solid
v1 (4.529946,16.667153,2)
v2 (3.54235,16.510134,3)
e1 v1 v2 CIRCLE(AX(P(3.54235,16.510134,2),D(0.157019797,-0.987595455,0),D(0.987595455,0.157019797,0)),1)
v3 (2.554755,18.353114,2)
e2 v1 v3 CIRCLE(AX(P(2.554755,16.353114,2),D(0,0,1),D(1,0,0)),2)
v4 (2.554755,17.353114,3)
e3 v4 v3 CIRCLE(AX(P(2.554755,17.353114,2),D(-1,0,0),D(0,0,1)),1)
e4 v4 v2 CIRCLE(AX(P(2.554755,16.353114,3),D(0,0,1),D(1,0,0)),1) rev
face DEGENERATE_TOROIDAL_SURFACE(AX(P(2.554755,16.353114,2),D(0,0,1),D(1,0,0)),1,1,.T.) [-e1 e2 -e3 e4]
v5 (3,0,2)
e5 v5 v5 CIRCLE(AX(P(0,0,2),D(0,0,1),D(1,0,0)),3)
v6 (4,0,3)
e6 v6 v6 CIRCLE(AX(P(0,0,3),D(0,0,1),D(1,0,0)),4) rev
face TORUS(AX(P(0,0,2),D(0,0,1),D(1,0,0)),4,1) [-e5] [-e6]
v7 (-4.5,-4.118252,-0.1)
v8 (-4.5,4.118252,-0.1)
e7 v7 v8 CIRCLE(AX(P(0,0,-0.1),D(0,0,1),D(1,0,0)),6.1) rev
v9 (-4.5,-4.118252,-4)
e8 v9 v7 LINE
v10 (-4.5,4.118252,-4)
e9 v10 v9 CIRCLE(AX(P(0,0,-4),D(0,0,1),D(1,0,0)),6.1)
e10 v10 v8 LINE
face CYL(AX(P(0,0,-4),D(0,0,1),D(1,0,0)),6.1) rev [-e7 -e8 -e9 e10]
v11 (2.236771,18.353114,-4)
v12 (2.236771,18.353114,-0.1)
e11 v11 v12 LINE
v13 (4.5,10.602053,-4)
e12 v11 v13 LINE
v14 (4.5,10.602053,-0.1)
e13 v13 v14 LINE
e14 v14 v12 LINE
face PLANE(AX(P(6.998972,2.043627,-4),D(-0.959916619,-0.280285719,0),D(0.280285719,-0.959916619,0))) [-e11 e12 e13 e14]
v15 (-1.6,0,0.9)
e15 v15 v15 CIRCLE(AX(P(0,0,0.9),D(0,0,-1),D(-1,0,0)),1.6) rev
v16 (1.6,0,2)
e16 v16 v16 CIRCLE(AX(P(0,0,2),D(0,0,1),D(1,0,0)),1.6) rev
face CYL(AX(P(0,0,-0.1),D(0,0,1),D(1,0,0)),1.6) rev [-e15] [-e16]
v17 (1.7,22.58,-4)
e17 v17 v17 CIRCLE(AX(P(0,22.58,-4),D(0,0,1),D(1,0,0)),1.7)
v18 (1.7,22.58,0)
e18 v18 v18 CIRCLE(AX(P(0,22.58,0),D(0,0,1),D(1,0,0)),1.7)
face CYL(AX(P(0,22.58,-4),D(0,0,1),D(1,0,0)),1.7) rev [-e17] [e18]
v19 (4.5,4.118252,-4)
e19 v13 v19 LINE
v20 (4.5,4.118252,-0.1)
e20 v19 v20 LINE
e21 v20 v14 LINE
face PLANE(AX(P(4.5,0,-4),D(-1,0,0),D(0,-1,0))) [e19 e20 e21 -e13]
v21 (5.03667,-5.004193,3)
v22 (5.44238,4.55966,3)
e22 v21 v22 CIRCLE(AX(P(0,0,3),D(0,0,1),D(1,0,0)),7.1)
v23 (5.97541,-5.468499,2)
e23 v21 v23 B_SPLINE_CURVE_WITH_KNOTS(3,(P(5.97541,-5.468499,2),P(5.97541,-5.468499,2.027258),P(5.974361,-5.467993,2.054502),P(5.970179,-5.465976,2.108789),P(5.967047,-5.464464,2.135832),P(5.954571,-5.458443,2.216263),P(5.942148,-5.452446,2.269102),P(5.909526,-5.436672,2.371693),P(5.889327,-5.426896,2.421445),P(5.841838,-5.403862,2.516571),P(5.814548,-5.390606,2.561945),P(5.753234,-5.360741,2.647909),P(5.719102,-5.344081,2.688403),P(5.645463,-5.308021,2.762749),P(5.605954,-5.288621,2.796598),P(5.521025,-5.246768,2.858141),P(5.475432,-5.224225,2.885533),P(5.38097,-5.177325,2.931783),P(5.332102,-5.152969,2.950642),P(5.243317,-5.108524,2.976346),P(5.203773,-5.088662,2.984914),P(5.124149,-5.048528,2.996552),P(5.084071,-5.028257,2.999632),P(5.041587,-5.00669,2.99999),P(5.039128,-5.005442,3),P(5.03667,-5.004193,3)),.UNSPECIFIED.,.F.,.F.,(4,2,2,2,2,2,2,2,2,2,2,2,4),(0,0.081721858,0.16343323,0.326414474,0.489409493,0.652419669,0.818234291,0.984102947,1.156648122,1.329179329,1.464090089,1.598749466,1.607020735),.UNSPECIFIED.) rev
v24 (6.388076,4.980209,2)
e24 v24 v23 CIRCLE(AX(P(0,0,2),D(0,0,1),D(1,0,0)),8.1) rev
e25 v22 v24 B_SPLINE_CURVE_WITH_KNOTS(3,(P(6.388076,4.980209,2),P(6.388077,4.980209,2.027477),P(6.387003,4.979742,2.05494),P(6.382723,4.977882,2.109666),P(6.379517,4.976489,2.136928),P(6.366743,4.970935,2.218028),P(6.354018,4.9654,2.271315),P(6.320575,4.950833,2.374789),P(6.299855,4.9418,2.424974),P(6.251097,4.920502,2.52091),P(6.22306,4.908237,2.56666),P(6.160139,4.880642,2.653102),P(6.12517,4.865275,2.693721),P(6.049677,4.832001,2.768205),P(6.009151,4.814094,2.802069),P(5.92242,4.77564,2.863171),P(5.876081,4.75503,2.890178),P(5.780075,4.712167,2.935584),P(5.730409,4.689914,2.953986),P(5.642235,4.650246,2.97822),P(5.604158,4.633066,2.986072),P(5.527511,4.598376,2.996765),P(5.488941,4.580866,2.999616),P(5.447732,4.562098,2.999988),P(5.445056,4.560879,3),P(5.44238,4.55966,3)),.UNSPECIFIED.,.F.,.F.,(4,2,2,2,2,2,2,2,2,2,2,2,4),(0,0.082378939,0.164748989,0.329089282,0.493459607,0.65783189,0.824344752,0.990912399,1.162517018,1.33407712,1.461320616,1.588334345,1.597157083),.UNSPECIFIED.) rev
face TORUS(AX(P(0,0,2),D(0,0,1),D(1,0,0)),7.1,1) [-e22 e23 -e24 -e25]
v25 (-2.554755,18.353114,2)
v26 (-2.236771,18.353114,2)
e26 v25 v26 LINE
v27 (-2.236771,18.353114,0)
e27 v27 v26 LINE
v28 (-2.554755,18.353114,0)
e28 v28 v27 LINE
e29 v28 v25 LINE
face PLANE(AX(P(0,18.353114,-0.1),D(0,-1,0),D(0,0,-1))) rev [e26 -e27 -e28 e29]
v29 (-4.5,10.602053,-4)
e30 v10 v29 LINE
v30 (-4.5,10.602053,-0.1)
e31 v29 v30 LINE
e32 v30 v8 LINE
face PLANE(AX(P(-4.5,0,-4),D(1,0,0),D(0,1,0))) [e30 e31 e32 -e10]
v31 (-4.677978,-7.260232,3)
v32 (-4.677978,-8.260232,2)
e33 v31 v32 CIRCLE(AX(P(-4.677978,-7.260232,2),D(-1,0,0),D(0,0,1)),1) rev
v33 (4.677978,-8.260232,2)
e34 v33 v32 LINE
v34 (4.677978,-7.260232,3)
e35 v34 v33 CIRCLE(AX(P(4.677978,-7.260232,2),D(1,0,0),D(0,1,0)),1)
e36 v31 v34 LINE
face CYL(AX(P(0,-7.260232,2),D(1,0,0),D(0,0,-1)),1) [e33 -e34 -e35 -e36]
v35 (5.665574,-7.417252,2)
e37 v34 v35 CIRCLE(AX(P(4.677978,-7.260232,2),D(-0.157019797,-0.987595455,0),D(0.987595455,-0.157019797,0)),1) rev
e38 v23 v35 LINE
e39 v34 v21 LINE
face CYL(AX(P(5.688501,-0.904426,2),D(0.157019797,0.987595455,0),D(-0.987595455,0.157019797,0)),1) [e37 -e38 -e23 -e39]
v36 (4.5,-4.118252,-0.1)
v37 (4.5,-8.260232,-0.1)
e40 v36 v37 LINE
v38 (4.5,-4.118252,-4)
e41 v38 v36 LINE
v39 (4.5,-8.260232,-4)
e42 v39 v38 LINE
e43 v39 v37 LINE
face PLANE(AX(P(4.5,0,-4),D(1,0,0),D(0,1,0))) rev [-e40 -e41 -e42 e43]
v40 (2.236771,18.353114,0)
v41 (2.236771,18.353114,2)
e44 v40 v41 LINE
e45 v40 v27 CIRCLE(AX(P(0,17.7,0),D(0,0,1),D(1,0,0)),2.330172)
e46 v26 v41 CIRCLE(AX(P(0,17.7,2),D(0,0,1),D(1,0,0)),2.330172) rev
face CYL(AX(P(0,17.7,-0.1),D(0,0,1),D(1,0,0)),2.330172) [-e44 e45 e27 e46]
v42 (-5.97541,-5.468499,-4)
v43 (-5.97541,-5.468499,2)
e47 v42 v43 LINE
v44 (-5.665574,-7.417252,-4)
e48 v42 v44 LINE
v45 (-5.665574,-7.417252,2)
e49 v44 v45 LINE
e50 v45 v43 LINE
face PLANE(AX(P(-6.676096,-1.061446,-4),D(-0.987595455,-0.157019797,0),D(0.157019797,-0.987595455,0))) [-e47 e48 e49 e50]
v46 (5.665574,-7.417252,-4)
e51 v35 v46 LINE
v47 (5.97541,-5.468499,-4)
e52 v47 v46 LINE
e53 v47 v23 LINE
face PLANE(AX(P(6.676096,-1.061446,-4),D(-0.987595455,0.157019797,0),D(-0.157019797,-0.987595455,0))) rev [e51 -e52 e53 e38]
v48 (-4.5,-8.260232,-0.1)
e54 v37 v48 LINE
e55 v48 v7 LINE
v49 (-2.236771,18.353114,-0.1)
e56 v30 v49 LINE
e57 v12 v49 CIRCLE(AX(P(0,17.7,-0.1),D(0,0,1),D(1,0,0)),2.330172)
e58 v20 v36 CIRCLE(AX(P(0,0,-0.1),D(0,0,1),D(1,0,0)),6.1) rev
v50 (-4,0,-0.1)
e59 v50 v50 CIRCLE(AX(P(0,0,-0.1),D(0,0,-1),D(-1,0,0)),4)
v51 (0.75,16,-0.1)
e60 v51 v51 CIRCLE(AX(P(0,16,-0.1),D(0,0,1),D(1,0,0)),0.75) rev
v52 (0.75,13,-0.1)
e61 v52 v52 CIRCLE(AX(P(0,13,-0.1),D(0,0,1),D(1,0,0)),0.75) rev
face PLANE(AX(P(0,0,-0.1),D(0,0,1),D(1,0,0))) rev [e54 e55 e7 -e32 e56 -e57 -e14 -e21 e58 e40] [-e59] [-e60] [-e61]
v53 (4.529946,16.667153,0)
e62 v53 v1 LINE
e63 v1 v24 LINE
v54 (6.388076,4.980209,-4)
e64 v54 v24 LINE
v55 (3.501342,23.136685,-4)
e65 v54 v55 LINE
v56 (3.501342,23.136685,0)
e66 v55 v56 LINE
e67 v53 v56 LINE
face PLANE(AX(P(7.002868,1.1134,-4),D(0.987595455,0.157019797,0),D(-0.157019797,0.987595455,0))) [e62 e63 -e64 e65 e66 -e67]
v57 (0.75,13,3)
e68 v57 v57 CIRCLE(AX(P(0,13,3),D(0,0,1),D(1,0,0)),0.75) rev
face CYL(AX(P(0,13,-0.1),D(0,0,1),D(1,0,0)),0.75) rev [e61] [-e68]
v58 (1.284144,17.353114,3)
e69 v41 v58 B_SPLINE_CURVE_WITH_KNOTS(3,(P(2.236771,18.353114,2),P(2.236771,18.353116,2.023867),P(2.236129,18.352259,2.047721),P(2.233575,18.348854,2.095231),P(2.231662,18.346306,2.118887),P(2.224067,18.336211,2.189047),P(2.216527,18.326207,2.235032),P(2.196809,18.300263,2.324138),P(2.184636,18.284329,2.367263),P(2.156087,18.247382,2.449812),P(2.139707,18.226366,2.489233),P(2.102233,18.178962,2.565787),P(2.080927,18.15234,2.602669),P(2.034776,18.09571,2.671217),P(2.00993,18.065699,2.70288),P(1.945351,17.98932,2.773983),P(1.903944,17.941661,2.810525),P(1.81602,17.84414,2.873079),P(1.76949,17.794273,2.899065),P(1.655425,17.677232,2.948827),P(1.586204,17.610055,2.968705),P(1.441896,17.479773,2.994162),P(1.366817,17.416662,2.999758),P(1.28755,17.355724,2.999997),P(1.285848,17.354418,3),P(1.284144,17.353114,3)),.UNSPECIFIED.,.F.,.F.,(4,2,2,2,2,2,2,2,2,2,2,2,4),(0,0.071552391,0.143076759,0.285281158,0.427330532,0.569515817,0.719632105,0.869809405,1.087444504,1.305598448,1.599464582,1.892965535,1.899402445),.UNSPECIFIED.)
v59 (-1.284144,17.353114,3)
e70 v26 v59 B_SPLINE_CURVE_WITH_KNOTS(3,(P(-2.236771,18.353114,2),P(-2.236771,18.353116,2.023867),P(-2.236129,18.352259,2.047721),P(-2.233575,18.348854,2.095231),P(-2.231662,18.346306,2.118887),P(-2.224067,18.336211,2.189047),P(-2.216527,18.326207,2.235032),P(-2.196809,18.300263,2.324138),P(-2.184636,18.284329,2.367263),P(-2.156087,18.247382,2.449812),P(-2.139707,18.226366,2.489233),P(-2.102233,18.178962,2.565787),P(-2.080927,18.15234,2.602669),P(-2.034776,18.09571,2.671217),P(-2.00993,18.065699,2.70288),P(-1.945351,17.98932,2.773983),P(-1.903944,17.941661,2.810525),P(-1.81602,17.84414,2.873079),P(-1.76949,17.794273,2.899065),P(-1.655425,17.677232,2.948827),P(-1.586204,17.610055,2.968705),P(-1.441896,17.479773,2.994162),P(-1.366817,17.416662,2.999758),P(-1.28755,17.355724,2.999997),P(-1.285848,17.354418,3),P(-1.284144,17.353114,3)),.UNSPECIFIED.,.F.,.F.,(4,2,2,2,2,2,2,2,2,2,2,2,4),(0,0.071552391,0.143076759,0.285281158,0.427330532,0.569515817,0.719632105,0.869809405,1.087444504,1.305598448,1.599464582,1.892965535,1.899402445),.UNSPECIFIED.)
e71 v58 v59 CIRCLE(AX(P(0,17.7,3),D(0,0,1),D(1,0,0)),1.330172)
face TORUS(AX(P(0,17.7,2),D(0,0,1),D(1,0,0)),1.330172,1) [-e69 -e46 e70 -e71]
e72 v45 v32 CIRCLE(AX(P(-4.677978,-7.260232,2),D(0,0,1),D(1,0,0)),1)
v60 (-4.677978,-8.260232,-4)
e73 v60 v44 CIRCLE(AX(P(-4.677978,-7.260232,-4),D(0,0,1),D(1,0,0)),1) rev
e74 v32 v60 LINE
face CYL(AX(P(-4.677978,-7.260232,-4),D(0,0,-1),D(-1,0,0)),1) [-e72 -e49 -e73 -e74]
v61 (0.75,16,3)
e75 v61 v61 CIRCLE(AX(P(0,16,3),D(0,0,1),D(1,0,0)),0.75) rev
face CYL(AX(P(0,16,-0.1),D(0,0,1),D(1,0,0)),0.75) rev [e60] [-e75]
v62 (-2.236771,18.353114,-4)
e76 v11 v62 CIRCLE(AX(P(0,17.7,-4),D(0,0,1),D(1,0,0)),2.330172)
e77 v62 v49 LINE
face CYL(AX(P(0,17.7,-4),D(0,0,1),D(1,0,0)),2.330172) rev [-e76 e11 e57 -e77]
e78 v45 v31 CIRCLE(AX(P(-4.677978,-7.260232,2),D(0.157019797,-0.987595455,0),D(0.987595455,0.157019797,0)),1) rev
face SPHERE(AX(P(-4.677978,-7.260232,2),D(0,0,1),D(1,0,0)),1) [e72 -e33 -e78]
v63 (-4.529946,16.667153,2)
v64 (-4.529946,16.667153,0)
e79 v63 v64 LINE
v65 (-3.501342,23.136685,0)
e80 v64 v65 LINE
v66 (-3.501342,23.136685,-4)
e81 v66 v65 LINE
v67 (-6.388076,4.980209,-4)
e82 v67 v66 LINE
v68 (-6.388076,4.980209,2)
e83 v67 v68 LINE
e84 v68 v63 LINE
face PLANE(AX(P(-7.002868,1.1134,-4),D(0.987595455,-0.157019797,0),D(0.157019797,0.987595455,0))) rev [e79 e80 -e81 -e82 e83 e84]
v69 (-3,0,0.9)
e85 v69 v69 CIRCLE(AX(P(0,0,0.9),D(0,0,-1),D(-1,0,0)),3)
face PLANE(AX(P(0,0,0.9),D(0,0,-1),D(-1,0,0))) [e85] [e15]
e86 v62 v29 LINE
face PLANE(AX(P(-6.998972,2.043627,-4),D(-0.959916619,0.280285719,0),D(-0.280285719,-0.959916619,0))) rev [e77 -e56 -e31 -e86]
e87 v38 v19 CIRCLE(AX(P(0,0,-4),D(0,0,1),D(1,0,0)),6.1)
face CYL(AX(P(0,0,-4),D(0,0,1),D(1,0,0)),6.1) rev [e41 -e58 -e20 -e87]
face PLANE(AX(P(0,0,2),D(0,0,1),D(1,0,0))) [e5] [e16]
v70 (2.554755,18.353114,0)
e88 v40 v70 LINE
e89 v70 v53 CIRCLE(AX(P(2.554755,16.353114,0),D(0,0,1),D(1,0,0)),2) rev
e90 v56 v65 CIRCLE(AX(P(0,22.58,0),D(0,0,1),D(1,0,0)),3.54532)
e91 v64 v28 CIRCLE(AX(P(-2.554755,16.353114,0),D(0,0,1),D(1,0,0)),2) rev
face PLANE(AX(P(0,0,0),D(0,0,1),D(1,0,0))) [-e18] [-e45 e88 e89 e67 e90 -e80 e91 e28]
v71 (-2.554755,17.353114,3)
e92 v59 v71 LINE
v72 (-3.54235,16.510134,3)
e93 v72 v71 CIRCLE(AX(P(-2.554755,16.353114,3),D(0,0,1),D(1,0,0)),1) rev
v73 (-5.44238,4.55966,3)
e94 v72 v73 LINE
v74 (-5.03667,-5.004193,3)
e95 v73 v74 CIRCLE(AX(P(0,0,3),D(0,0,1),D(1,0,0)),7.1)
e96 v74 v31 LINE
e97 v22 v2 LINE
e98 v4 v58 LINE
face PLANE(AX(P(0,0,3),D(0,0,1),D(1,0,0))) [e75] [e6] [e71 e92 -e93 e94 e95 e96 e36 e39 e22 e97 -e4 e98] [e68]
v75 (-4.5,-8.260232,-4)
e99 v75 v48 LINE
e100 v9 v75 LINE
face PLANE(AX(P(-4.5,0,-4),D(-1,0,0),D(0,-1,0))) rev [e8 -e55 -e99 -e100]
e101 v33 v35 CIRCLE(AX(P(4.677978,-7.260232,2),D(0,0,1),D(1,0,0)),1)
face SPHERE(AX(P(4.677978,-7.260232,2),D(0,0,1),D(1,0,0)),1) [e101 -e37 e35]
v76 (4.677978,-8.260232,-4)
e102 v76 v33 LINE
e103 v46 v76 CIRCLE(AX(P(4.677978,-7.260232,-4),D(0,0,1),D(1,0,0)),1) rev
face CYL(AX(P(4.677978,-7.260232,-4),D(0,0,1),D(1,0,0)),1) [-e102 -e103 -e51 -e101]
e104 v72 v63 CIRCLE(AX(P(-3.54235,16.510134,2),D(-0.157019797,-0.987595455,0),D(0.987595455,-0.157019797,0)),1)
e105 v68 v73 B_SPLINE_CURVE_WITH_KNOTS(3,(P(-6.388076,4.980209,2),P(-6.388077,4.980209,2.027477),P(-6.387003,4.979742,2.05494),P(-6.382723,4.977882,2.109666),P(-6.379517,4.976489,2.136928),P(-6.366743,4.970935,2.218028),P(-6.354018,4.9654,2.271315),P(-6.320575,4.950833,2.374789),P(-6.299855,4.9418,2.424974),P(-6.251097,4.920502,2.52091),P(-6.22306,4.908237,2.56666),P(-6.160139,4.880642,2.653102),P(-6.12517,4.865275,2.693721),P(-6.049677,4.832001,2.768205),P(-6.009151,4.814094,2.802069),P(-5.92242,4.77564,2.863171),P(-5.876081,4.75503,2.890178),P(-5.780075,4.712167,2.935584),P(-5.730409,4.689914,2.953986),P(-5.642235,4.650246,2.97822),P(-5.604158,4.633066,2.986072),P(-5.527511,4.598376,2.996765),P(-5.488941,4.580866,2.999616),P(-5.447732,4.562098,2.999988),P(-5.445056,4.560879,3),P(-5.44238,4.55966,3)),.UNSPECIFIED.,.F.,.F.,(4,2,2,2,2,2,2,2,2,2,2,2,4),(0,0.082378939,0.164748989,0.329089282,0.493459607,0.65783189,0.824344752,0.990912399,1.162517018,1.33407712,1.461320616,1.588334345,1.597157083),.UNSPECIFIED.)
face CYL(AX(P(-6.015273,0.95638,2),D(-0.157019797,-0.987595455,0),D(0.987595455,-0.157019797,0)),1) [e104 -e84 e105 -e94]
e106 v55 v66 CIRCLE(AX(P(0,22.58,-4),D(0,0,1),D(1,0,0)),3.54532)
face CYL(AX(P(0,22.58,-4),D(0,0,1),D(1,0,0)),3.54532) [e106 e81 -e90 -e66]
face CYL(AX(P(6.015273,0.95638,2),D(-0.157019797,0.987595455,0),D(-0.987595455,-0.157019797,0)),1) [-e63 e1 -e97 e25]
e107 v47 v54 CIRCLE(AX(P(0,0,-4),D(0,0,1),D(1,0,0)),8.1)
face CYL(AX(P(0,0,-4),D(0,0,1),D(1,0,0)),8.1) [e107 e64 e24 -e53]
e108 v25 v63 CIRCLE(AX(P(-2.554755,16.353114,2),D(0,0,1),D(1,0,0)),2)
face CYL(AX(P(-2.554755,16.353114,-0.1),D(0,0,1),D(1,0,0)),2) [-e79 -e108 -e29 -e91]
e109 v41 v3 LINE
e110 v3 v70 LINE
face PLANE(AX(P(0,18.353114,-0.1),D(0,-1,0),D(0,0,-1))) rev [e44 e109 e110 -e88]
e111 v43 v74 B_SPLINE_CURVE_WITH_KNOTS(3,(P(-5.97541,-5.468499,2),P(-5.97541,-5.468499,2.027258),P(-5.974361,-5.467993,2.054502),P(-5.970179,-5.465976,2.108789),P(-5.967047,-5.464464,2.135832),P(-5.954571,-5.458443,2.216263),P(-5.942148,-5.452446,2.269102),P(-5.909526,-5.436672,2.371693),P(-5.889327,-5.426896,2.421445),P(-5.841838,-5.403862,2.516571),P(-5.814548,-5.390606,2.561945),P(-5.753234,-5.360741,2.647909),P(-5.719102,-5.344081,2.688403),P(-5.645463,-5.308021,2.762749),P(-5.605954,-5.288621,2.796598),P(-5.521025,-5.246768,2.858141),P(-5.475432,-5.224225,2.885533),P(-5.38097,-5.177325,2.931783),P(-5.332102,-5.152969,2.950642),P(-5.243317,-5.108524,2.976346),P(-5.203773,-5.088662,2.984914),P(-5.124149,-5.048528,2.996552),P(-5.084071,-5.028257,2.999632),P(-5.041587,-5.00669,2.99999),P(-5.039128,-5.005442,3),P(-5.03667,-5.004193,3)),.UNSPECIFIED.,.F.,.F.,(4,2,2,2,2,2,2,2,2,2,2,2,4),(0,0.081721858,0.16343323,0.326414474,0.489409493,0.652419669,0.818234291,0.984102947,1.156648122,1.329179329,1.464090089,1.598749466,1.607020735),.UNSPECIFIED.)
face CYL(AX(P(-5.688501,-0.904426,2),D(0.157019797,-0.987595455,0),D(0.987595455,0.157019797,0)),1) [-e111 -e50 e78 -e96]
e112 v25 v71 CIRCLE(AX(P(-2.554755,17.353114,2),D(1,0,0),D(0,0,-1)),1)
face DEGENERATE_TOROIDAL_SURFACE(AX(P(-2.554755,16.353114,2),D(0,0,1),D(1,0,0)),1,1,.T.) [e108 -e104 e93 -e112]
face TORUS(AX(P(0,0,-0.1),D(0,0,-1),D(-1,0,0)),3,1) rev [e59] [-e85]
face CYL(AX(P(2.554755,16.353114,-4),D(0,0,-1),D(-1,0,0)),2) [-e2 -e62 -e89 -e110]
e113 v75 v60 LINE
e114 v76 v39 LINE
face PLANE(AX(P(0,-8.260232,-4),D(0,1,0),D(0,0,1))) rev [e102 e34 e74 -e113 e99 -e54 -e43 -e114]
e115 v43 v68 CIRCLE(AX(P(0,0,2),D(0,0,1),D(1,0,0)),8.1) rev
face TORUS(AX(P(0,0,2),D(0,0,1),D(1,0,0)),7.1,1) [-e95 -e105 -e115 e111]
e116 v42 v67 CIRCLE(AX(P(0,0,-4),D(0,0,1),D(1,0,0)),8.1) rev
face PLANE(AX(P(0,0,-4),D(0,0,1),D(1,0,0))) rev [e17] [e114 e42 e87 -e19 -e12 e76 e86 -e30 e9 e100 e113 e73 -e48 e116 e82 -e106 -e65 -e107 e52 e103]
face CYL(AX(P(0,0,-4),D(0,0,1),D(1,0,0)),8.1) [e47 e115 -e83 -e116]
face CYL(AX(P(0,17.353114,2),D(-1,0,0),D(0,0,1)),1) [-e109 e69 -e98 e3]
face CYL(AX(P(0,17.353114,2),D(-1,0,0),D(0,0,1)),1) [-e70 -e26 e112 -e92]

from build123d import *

# Parameters (mm, degrees)
SKETCH1_R                = 1.7
BOSS_EXTRUDE4_DEPTH      = 4
BOSS_EXTRUDE6_DEPTH      = 3
BOSS_EXTRUDE6_DEPTH_BACK = 0.1
SKETCH1_9_R              = 0.749999999999988
SKETCH1_9_R_2            = 0.749999999999991
SKETCH1_9_R_3            = 1.6
FILLET2_R                = 1
FILLET3_R                = 2
SKETCH2_R                = 4
CUT_EXTRUDE1_DEPTH       = 1
SKETCH3_R                = 3.0000000000000004
CUT_EXTRUDE2_DEPTH       = 1
FILLET4_R                = 1
FILLET5_R                = 1


# Some blends are built 0.0001 mm under size
with BuildPart() as part:
    # Sketch1 → Boss-Extrude4 (new body)
    with BuildSketch(Plane.XY):
        with BuildLine():
            Line((-3.5013415582545715, 23.136685369325342), (-6.388076465833109, 4.9802087372588275))
            ThreePointArc((-6.388076465833109, 4.9802087372588275), (-8.093690123038968, -0.31965636583910695), (-5.975409836065571, -5.468498632261951))
            Line((-5.9754098360655705, -5.468498632261951), (-5.531546482610164, -8.2602321522629))
            Line((-5.531546482610164, -8.2602321522629), (-4.5, -8.2602321522629))
            Line((-4.499999999999999, -8.2602321522629), (-4.500000000000003, -4.1182520563948))
            ThreePointArc((-4.500000000000003, -4.1182520563948), (-6.1, -6.7e-16), (-4.500000000000001, 4.118252056394799))
            Line((-4.5, 4.118252056394798), (-4.500000000000003, 10.602053391322137))
            Line((-4.500000000000003, 10.602053391322137), (-2.23677055895614, 18.353113855252126))
            ThreePointArc((-2.236770558956141, 18.353113855252126), (5.33e-15, 20.030171719280638), (2.2367705589561506, 18.353113855252126))
            Line((2.2367705589561497, 18.353113855252126), (4.499999999999999, 10.602053391322137))
            Line((4.499999999999999, 10.602053391322137), (4.500000000000003, 4.1182520563948))
            ThreePointArc((4.5000000000000036, 4.1182520563948), (6.099999999999998, -2.2e-16), (4.5, -4.118252056394798))
            Line((4.5, -4.118252056394798), (4.500000000000001, -8.260232152262898))
            Line((4.500000000000001, -8.2602321522629), (5.531546482610164, -8.2602321522629))
            Line((5.531546482610164, -8.2602321522629), (5.975409836065575, -5.468498632261945))
            ThreePointArc((5.975409836065576, -5.468498632261946), (8.093690123038972, -0.3196563658391036), (6.388076465833111, 4.9802087372588275))
            Line((6.388076465833109, 4.9802087372588275), (3.5013415582545715, 23.136685369325342))
            ThreePointArc((3.5013415582545715, 23.136685369325342), (-1.1e-16, 26.125319634106553), (-3.5013415582545715, 23.136685369325342))
        make_face()
        with Locations((0, 22.58)):
            Circle(SKETCH1_R, mode=Mode.SUBTRACT)
    extrude(amount=-BOSS_EXTRUDE4_DEPTH)

    # Sketch1<9> → Boss-Extrude6 (add, two sides: drawn at the far end of the back side and taken through both)
    with BuildSketch(Plane.XY.offset(-BOSS_EXTRUDE6_DEPTH_BACK)):
        with BuildLine():
            Line((-2.2367705589561404, 18.353113855252126), (-4.261891259190779, 18.353113855252126))
            Line((-4.261891259190779, 18.353113855252126), (-6.388076465833109, 4.9802087372588275))
            ThreePointArc((-6.388076465833109, 4.9802087372588275), (-8.093690123038968, -0.31965636583910695), (-5.975409836065571, -5.468498632261951))
            Line((-5.9754098360655705, -5.468498632261951), (-5.531546482610164, -8.2602321522629))
            Line((-5.531546482610164, -8.2602321522629), (5.531546482610164, -8.2602321522629))
            Line((5.531546482610164, -8.2602321522629), (5.975409836065575, -5.468498632261945))
            ThreePointArc((5.975409836065576, -5.468498632261946), (8.093690123038972, -0.3196563658391036), (6.388076465833111, 4.9802087372588275))
            Line((6.388076465833109, 4.9802087372588275), (4.261891259190779, 18.353113855252126))
            Line((4.261891259190779, 18.353113855252126), (2.2367705589561506, 18.353113855252126))
            ThreePointArc((2.2367705589561506, 18.353113855252126), (5.33e-15, 20.030171719280638), (-2.236770558956141, 18.353113855252126))
        make_face()
        with Locations((5.15e-15, 16)):
            Circle(SKETCH1_9_R, mode=Mode.SUBTRACT)
        with Locations((4.18e-15, 13.000000000000002)):
            Circle(SKETCH1_9_R_2, mode=Mode.SUBTRACT)
        Circle(SKETCH1_9_R_3, mode=Mode.SUBTRACT)
    extrude(amount=BOSS_EXTRUDE6_DEPTH + BOSS_EXTRUDE6_DEPTH_BACK)

    # Fillet2
    fillet2_edges = [part.edges().sort_by_distance(p)[0] for p in [
        (5.531546482610164, -8.2602321522629, -0.5),
        (-5.531546482610164, -8.2602321522629, -0.5),
        (0, -8.2602321522629, 3),
        (5.753478159337869, -6.864365392262423, 3),
        (-8.093690123038968, -0.3196563658391076, 3),
        (-5.324983862511944, 11.666661296255477, 3),
        (-3.2493309090734597, 18.353113855252126, 3),
        (3.249330909073465, 18.353113855252126, 3),
        (5e-15, 20.030171719280638, 3),
        (-5.753478159337868, -6.864365392262425, 3),
        (8.093690123038972, -0.31965636583910384, 3),
        (5.324983862511944, 11.666661296255477, 3),
    ]]
    fillet(fillet2_edges, radius=FILLET2_R)

    # Fillet3
    # the kernel refuses this fillet: 2 mm, written as the material it takes off along each edge
    with BuildSketch(Plane(origin=(-2.554754600251938, 16.35311385525213, 3), x_dir=(0, 1, 0), z_dir=(1, 0, 0))) as fillet3_piece_1:
        with BuildLine():
            CenterArc((1, -1), 1, 0, 90)
            Line((2, -1), (2, 0))
            Line((2, 0), (1, 0))
        make_face()
    revolve(axis=Axis((-2.554754600251938, 16.35311385525213, 3), (0, 0, 1)), revolution_arc=80.96604330855703, mode=Mode.SUBTRACT)
    with BuildSketch(Plane(origin=(2.554754600251939, 16.35311385525213, 3), x_dir=(0.9875954553070736, 0.15701979702194924, 0), z_dir=(0.15701979702194924, -0.9875954553070736, 0))) as fillet3_piece_2:
        with BuildLine():
            CenterArc((1, -1), 1, 0, 90)
            Line((2, -1), (2, 0))
            Line((2, 0), (1, 0))
        make_face()
    revolve(axis=Axis((2.554754600251939, 16.35311385525213, 3), (0, 0, 1)), revolution_arc=80.96604330855705, mode=Mode.SUBTRACT)
    with BuildSketch(Plane(origin=(4.261891259190781, 18.353113855252126, 3), x_dir=(0.15701979702194913, -0.9875954553070736, 0), z_dir=(0, 0, -1))) as fillet3_piece_3:
        with BuildLine():
            CenterArc((FILLET3_R * 0.853568329469, FILLET3_R), FILLET3_R, 189.03395669144297, 80.96604330855706)
            Line((-FILLET3_R * 0.134027125838, FILLET3_R * 0.842980202978), (0, 0))
            Line((0, 0), (FILLET3_R * 0.853568329469, -3e-17))
        make_face()
    extrude(amount=3, mode=Mode.SUBTRACT)
    with BuildSketch(Plane(origin=(-4.261891259190779, 18.353113855252126, 0), x_dir=(-0.15701979702194965, -0.9875954553070736, 0), z_dir=(0, 0, 1))) as fillet3_piece_4:
        with BuildLine():
            CenterArc((FILLET3_R * 0.853568329469, FILLET3_R), FILLET3_R, 189.033956691443, 80.96604330855706)
            Line((-FILLET3_R * 0.134027125838, FILLET3_R * 0.842980202978), (0, 0))
            Line((0, 0), (FILLET3_R * 0.853568329469, -3e-17))
        make_face()
    extrude(amount=3.000000000000001, mode=Mode.SUBTRACT)

    # Sketch2 → Cut-Extrude1 (cut)
    with BuildSketch(Plane(origin=(0, 0, -0.1), x_dir=(-1, 0, 0), z_dir=(0, 0, -1))):
        Circle(SKETCH2_R)
    extrude(amount=-CUT_EXTRUDE1_DEPTH, mode=Mode.SUBTRACT)

    # Sketch3 → Cut-Extrude2 (cut)
    with BuildSketch(Plane.XY.offset(3)):
        Circle(SKETCH3_R)
    extrude(amount=-CUT_EXTRUDE2_DEPTH, mode=Mode.SUBTRACT)

    # Fillet4
    fillet4_edges = [part.edges().sort_by_distance(p)[0] for p in [
        (4, 4.9e-16, 0.9),
    ]]
    fillet(fillet4_edges, radius=FILLET4_R - 0.0001)  # a hair under: the kernel refuses the full size

    # Fillet5
    fillet5_edges = [part.edges().sort_by_distance(p)[0] for p in [
        (-3.0000000000000004, 3.7e-16, 3),
    ]]
    fillet(fillet5_edges, radius=FILLET5_R - 0.0001)  # a hair under: the kernel refuses the full size


solid = part.part
